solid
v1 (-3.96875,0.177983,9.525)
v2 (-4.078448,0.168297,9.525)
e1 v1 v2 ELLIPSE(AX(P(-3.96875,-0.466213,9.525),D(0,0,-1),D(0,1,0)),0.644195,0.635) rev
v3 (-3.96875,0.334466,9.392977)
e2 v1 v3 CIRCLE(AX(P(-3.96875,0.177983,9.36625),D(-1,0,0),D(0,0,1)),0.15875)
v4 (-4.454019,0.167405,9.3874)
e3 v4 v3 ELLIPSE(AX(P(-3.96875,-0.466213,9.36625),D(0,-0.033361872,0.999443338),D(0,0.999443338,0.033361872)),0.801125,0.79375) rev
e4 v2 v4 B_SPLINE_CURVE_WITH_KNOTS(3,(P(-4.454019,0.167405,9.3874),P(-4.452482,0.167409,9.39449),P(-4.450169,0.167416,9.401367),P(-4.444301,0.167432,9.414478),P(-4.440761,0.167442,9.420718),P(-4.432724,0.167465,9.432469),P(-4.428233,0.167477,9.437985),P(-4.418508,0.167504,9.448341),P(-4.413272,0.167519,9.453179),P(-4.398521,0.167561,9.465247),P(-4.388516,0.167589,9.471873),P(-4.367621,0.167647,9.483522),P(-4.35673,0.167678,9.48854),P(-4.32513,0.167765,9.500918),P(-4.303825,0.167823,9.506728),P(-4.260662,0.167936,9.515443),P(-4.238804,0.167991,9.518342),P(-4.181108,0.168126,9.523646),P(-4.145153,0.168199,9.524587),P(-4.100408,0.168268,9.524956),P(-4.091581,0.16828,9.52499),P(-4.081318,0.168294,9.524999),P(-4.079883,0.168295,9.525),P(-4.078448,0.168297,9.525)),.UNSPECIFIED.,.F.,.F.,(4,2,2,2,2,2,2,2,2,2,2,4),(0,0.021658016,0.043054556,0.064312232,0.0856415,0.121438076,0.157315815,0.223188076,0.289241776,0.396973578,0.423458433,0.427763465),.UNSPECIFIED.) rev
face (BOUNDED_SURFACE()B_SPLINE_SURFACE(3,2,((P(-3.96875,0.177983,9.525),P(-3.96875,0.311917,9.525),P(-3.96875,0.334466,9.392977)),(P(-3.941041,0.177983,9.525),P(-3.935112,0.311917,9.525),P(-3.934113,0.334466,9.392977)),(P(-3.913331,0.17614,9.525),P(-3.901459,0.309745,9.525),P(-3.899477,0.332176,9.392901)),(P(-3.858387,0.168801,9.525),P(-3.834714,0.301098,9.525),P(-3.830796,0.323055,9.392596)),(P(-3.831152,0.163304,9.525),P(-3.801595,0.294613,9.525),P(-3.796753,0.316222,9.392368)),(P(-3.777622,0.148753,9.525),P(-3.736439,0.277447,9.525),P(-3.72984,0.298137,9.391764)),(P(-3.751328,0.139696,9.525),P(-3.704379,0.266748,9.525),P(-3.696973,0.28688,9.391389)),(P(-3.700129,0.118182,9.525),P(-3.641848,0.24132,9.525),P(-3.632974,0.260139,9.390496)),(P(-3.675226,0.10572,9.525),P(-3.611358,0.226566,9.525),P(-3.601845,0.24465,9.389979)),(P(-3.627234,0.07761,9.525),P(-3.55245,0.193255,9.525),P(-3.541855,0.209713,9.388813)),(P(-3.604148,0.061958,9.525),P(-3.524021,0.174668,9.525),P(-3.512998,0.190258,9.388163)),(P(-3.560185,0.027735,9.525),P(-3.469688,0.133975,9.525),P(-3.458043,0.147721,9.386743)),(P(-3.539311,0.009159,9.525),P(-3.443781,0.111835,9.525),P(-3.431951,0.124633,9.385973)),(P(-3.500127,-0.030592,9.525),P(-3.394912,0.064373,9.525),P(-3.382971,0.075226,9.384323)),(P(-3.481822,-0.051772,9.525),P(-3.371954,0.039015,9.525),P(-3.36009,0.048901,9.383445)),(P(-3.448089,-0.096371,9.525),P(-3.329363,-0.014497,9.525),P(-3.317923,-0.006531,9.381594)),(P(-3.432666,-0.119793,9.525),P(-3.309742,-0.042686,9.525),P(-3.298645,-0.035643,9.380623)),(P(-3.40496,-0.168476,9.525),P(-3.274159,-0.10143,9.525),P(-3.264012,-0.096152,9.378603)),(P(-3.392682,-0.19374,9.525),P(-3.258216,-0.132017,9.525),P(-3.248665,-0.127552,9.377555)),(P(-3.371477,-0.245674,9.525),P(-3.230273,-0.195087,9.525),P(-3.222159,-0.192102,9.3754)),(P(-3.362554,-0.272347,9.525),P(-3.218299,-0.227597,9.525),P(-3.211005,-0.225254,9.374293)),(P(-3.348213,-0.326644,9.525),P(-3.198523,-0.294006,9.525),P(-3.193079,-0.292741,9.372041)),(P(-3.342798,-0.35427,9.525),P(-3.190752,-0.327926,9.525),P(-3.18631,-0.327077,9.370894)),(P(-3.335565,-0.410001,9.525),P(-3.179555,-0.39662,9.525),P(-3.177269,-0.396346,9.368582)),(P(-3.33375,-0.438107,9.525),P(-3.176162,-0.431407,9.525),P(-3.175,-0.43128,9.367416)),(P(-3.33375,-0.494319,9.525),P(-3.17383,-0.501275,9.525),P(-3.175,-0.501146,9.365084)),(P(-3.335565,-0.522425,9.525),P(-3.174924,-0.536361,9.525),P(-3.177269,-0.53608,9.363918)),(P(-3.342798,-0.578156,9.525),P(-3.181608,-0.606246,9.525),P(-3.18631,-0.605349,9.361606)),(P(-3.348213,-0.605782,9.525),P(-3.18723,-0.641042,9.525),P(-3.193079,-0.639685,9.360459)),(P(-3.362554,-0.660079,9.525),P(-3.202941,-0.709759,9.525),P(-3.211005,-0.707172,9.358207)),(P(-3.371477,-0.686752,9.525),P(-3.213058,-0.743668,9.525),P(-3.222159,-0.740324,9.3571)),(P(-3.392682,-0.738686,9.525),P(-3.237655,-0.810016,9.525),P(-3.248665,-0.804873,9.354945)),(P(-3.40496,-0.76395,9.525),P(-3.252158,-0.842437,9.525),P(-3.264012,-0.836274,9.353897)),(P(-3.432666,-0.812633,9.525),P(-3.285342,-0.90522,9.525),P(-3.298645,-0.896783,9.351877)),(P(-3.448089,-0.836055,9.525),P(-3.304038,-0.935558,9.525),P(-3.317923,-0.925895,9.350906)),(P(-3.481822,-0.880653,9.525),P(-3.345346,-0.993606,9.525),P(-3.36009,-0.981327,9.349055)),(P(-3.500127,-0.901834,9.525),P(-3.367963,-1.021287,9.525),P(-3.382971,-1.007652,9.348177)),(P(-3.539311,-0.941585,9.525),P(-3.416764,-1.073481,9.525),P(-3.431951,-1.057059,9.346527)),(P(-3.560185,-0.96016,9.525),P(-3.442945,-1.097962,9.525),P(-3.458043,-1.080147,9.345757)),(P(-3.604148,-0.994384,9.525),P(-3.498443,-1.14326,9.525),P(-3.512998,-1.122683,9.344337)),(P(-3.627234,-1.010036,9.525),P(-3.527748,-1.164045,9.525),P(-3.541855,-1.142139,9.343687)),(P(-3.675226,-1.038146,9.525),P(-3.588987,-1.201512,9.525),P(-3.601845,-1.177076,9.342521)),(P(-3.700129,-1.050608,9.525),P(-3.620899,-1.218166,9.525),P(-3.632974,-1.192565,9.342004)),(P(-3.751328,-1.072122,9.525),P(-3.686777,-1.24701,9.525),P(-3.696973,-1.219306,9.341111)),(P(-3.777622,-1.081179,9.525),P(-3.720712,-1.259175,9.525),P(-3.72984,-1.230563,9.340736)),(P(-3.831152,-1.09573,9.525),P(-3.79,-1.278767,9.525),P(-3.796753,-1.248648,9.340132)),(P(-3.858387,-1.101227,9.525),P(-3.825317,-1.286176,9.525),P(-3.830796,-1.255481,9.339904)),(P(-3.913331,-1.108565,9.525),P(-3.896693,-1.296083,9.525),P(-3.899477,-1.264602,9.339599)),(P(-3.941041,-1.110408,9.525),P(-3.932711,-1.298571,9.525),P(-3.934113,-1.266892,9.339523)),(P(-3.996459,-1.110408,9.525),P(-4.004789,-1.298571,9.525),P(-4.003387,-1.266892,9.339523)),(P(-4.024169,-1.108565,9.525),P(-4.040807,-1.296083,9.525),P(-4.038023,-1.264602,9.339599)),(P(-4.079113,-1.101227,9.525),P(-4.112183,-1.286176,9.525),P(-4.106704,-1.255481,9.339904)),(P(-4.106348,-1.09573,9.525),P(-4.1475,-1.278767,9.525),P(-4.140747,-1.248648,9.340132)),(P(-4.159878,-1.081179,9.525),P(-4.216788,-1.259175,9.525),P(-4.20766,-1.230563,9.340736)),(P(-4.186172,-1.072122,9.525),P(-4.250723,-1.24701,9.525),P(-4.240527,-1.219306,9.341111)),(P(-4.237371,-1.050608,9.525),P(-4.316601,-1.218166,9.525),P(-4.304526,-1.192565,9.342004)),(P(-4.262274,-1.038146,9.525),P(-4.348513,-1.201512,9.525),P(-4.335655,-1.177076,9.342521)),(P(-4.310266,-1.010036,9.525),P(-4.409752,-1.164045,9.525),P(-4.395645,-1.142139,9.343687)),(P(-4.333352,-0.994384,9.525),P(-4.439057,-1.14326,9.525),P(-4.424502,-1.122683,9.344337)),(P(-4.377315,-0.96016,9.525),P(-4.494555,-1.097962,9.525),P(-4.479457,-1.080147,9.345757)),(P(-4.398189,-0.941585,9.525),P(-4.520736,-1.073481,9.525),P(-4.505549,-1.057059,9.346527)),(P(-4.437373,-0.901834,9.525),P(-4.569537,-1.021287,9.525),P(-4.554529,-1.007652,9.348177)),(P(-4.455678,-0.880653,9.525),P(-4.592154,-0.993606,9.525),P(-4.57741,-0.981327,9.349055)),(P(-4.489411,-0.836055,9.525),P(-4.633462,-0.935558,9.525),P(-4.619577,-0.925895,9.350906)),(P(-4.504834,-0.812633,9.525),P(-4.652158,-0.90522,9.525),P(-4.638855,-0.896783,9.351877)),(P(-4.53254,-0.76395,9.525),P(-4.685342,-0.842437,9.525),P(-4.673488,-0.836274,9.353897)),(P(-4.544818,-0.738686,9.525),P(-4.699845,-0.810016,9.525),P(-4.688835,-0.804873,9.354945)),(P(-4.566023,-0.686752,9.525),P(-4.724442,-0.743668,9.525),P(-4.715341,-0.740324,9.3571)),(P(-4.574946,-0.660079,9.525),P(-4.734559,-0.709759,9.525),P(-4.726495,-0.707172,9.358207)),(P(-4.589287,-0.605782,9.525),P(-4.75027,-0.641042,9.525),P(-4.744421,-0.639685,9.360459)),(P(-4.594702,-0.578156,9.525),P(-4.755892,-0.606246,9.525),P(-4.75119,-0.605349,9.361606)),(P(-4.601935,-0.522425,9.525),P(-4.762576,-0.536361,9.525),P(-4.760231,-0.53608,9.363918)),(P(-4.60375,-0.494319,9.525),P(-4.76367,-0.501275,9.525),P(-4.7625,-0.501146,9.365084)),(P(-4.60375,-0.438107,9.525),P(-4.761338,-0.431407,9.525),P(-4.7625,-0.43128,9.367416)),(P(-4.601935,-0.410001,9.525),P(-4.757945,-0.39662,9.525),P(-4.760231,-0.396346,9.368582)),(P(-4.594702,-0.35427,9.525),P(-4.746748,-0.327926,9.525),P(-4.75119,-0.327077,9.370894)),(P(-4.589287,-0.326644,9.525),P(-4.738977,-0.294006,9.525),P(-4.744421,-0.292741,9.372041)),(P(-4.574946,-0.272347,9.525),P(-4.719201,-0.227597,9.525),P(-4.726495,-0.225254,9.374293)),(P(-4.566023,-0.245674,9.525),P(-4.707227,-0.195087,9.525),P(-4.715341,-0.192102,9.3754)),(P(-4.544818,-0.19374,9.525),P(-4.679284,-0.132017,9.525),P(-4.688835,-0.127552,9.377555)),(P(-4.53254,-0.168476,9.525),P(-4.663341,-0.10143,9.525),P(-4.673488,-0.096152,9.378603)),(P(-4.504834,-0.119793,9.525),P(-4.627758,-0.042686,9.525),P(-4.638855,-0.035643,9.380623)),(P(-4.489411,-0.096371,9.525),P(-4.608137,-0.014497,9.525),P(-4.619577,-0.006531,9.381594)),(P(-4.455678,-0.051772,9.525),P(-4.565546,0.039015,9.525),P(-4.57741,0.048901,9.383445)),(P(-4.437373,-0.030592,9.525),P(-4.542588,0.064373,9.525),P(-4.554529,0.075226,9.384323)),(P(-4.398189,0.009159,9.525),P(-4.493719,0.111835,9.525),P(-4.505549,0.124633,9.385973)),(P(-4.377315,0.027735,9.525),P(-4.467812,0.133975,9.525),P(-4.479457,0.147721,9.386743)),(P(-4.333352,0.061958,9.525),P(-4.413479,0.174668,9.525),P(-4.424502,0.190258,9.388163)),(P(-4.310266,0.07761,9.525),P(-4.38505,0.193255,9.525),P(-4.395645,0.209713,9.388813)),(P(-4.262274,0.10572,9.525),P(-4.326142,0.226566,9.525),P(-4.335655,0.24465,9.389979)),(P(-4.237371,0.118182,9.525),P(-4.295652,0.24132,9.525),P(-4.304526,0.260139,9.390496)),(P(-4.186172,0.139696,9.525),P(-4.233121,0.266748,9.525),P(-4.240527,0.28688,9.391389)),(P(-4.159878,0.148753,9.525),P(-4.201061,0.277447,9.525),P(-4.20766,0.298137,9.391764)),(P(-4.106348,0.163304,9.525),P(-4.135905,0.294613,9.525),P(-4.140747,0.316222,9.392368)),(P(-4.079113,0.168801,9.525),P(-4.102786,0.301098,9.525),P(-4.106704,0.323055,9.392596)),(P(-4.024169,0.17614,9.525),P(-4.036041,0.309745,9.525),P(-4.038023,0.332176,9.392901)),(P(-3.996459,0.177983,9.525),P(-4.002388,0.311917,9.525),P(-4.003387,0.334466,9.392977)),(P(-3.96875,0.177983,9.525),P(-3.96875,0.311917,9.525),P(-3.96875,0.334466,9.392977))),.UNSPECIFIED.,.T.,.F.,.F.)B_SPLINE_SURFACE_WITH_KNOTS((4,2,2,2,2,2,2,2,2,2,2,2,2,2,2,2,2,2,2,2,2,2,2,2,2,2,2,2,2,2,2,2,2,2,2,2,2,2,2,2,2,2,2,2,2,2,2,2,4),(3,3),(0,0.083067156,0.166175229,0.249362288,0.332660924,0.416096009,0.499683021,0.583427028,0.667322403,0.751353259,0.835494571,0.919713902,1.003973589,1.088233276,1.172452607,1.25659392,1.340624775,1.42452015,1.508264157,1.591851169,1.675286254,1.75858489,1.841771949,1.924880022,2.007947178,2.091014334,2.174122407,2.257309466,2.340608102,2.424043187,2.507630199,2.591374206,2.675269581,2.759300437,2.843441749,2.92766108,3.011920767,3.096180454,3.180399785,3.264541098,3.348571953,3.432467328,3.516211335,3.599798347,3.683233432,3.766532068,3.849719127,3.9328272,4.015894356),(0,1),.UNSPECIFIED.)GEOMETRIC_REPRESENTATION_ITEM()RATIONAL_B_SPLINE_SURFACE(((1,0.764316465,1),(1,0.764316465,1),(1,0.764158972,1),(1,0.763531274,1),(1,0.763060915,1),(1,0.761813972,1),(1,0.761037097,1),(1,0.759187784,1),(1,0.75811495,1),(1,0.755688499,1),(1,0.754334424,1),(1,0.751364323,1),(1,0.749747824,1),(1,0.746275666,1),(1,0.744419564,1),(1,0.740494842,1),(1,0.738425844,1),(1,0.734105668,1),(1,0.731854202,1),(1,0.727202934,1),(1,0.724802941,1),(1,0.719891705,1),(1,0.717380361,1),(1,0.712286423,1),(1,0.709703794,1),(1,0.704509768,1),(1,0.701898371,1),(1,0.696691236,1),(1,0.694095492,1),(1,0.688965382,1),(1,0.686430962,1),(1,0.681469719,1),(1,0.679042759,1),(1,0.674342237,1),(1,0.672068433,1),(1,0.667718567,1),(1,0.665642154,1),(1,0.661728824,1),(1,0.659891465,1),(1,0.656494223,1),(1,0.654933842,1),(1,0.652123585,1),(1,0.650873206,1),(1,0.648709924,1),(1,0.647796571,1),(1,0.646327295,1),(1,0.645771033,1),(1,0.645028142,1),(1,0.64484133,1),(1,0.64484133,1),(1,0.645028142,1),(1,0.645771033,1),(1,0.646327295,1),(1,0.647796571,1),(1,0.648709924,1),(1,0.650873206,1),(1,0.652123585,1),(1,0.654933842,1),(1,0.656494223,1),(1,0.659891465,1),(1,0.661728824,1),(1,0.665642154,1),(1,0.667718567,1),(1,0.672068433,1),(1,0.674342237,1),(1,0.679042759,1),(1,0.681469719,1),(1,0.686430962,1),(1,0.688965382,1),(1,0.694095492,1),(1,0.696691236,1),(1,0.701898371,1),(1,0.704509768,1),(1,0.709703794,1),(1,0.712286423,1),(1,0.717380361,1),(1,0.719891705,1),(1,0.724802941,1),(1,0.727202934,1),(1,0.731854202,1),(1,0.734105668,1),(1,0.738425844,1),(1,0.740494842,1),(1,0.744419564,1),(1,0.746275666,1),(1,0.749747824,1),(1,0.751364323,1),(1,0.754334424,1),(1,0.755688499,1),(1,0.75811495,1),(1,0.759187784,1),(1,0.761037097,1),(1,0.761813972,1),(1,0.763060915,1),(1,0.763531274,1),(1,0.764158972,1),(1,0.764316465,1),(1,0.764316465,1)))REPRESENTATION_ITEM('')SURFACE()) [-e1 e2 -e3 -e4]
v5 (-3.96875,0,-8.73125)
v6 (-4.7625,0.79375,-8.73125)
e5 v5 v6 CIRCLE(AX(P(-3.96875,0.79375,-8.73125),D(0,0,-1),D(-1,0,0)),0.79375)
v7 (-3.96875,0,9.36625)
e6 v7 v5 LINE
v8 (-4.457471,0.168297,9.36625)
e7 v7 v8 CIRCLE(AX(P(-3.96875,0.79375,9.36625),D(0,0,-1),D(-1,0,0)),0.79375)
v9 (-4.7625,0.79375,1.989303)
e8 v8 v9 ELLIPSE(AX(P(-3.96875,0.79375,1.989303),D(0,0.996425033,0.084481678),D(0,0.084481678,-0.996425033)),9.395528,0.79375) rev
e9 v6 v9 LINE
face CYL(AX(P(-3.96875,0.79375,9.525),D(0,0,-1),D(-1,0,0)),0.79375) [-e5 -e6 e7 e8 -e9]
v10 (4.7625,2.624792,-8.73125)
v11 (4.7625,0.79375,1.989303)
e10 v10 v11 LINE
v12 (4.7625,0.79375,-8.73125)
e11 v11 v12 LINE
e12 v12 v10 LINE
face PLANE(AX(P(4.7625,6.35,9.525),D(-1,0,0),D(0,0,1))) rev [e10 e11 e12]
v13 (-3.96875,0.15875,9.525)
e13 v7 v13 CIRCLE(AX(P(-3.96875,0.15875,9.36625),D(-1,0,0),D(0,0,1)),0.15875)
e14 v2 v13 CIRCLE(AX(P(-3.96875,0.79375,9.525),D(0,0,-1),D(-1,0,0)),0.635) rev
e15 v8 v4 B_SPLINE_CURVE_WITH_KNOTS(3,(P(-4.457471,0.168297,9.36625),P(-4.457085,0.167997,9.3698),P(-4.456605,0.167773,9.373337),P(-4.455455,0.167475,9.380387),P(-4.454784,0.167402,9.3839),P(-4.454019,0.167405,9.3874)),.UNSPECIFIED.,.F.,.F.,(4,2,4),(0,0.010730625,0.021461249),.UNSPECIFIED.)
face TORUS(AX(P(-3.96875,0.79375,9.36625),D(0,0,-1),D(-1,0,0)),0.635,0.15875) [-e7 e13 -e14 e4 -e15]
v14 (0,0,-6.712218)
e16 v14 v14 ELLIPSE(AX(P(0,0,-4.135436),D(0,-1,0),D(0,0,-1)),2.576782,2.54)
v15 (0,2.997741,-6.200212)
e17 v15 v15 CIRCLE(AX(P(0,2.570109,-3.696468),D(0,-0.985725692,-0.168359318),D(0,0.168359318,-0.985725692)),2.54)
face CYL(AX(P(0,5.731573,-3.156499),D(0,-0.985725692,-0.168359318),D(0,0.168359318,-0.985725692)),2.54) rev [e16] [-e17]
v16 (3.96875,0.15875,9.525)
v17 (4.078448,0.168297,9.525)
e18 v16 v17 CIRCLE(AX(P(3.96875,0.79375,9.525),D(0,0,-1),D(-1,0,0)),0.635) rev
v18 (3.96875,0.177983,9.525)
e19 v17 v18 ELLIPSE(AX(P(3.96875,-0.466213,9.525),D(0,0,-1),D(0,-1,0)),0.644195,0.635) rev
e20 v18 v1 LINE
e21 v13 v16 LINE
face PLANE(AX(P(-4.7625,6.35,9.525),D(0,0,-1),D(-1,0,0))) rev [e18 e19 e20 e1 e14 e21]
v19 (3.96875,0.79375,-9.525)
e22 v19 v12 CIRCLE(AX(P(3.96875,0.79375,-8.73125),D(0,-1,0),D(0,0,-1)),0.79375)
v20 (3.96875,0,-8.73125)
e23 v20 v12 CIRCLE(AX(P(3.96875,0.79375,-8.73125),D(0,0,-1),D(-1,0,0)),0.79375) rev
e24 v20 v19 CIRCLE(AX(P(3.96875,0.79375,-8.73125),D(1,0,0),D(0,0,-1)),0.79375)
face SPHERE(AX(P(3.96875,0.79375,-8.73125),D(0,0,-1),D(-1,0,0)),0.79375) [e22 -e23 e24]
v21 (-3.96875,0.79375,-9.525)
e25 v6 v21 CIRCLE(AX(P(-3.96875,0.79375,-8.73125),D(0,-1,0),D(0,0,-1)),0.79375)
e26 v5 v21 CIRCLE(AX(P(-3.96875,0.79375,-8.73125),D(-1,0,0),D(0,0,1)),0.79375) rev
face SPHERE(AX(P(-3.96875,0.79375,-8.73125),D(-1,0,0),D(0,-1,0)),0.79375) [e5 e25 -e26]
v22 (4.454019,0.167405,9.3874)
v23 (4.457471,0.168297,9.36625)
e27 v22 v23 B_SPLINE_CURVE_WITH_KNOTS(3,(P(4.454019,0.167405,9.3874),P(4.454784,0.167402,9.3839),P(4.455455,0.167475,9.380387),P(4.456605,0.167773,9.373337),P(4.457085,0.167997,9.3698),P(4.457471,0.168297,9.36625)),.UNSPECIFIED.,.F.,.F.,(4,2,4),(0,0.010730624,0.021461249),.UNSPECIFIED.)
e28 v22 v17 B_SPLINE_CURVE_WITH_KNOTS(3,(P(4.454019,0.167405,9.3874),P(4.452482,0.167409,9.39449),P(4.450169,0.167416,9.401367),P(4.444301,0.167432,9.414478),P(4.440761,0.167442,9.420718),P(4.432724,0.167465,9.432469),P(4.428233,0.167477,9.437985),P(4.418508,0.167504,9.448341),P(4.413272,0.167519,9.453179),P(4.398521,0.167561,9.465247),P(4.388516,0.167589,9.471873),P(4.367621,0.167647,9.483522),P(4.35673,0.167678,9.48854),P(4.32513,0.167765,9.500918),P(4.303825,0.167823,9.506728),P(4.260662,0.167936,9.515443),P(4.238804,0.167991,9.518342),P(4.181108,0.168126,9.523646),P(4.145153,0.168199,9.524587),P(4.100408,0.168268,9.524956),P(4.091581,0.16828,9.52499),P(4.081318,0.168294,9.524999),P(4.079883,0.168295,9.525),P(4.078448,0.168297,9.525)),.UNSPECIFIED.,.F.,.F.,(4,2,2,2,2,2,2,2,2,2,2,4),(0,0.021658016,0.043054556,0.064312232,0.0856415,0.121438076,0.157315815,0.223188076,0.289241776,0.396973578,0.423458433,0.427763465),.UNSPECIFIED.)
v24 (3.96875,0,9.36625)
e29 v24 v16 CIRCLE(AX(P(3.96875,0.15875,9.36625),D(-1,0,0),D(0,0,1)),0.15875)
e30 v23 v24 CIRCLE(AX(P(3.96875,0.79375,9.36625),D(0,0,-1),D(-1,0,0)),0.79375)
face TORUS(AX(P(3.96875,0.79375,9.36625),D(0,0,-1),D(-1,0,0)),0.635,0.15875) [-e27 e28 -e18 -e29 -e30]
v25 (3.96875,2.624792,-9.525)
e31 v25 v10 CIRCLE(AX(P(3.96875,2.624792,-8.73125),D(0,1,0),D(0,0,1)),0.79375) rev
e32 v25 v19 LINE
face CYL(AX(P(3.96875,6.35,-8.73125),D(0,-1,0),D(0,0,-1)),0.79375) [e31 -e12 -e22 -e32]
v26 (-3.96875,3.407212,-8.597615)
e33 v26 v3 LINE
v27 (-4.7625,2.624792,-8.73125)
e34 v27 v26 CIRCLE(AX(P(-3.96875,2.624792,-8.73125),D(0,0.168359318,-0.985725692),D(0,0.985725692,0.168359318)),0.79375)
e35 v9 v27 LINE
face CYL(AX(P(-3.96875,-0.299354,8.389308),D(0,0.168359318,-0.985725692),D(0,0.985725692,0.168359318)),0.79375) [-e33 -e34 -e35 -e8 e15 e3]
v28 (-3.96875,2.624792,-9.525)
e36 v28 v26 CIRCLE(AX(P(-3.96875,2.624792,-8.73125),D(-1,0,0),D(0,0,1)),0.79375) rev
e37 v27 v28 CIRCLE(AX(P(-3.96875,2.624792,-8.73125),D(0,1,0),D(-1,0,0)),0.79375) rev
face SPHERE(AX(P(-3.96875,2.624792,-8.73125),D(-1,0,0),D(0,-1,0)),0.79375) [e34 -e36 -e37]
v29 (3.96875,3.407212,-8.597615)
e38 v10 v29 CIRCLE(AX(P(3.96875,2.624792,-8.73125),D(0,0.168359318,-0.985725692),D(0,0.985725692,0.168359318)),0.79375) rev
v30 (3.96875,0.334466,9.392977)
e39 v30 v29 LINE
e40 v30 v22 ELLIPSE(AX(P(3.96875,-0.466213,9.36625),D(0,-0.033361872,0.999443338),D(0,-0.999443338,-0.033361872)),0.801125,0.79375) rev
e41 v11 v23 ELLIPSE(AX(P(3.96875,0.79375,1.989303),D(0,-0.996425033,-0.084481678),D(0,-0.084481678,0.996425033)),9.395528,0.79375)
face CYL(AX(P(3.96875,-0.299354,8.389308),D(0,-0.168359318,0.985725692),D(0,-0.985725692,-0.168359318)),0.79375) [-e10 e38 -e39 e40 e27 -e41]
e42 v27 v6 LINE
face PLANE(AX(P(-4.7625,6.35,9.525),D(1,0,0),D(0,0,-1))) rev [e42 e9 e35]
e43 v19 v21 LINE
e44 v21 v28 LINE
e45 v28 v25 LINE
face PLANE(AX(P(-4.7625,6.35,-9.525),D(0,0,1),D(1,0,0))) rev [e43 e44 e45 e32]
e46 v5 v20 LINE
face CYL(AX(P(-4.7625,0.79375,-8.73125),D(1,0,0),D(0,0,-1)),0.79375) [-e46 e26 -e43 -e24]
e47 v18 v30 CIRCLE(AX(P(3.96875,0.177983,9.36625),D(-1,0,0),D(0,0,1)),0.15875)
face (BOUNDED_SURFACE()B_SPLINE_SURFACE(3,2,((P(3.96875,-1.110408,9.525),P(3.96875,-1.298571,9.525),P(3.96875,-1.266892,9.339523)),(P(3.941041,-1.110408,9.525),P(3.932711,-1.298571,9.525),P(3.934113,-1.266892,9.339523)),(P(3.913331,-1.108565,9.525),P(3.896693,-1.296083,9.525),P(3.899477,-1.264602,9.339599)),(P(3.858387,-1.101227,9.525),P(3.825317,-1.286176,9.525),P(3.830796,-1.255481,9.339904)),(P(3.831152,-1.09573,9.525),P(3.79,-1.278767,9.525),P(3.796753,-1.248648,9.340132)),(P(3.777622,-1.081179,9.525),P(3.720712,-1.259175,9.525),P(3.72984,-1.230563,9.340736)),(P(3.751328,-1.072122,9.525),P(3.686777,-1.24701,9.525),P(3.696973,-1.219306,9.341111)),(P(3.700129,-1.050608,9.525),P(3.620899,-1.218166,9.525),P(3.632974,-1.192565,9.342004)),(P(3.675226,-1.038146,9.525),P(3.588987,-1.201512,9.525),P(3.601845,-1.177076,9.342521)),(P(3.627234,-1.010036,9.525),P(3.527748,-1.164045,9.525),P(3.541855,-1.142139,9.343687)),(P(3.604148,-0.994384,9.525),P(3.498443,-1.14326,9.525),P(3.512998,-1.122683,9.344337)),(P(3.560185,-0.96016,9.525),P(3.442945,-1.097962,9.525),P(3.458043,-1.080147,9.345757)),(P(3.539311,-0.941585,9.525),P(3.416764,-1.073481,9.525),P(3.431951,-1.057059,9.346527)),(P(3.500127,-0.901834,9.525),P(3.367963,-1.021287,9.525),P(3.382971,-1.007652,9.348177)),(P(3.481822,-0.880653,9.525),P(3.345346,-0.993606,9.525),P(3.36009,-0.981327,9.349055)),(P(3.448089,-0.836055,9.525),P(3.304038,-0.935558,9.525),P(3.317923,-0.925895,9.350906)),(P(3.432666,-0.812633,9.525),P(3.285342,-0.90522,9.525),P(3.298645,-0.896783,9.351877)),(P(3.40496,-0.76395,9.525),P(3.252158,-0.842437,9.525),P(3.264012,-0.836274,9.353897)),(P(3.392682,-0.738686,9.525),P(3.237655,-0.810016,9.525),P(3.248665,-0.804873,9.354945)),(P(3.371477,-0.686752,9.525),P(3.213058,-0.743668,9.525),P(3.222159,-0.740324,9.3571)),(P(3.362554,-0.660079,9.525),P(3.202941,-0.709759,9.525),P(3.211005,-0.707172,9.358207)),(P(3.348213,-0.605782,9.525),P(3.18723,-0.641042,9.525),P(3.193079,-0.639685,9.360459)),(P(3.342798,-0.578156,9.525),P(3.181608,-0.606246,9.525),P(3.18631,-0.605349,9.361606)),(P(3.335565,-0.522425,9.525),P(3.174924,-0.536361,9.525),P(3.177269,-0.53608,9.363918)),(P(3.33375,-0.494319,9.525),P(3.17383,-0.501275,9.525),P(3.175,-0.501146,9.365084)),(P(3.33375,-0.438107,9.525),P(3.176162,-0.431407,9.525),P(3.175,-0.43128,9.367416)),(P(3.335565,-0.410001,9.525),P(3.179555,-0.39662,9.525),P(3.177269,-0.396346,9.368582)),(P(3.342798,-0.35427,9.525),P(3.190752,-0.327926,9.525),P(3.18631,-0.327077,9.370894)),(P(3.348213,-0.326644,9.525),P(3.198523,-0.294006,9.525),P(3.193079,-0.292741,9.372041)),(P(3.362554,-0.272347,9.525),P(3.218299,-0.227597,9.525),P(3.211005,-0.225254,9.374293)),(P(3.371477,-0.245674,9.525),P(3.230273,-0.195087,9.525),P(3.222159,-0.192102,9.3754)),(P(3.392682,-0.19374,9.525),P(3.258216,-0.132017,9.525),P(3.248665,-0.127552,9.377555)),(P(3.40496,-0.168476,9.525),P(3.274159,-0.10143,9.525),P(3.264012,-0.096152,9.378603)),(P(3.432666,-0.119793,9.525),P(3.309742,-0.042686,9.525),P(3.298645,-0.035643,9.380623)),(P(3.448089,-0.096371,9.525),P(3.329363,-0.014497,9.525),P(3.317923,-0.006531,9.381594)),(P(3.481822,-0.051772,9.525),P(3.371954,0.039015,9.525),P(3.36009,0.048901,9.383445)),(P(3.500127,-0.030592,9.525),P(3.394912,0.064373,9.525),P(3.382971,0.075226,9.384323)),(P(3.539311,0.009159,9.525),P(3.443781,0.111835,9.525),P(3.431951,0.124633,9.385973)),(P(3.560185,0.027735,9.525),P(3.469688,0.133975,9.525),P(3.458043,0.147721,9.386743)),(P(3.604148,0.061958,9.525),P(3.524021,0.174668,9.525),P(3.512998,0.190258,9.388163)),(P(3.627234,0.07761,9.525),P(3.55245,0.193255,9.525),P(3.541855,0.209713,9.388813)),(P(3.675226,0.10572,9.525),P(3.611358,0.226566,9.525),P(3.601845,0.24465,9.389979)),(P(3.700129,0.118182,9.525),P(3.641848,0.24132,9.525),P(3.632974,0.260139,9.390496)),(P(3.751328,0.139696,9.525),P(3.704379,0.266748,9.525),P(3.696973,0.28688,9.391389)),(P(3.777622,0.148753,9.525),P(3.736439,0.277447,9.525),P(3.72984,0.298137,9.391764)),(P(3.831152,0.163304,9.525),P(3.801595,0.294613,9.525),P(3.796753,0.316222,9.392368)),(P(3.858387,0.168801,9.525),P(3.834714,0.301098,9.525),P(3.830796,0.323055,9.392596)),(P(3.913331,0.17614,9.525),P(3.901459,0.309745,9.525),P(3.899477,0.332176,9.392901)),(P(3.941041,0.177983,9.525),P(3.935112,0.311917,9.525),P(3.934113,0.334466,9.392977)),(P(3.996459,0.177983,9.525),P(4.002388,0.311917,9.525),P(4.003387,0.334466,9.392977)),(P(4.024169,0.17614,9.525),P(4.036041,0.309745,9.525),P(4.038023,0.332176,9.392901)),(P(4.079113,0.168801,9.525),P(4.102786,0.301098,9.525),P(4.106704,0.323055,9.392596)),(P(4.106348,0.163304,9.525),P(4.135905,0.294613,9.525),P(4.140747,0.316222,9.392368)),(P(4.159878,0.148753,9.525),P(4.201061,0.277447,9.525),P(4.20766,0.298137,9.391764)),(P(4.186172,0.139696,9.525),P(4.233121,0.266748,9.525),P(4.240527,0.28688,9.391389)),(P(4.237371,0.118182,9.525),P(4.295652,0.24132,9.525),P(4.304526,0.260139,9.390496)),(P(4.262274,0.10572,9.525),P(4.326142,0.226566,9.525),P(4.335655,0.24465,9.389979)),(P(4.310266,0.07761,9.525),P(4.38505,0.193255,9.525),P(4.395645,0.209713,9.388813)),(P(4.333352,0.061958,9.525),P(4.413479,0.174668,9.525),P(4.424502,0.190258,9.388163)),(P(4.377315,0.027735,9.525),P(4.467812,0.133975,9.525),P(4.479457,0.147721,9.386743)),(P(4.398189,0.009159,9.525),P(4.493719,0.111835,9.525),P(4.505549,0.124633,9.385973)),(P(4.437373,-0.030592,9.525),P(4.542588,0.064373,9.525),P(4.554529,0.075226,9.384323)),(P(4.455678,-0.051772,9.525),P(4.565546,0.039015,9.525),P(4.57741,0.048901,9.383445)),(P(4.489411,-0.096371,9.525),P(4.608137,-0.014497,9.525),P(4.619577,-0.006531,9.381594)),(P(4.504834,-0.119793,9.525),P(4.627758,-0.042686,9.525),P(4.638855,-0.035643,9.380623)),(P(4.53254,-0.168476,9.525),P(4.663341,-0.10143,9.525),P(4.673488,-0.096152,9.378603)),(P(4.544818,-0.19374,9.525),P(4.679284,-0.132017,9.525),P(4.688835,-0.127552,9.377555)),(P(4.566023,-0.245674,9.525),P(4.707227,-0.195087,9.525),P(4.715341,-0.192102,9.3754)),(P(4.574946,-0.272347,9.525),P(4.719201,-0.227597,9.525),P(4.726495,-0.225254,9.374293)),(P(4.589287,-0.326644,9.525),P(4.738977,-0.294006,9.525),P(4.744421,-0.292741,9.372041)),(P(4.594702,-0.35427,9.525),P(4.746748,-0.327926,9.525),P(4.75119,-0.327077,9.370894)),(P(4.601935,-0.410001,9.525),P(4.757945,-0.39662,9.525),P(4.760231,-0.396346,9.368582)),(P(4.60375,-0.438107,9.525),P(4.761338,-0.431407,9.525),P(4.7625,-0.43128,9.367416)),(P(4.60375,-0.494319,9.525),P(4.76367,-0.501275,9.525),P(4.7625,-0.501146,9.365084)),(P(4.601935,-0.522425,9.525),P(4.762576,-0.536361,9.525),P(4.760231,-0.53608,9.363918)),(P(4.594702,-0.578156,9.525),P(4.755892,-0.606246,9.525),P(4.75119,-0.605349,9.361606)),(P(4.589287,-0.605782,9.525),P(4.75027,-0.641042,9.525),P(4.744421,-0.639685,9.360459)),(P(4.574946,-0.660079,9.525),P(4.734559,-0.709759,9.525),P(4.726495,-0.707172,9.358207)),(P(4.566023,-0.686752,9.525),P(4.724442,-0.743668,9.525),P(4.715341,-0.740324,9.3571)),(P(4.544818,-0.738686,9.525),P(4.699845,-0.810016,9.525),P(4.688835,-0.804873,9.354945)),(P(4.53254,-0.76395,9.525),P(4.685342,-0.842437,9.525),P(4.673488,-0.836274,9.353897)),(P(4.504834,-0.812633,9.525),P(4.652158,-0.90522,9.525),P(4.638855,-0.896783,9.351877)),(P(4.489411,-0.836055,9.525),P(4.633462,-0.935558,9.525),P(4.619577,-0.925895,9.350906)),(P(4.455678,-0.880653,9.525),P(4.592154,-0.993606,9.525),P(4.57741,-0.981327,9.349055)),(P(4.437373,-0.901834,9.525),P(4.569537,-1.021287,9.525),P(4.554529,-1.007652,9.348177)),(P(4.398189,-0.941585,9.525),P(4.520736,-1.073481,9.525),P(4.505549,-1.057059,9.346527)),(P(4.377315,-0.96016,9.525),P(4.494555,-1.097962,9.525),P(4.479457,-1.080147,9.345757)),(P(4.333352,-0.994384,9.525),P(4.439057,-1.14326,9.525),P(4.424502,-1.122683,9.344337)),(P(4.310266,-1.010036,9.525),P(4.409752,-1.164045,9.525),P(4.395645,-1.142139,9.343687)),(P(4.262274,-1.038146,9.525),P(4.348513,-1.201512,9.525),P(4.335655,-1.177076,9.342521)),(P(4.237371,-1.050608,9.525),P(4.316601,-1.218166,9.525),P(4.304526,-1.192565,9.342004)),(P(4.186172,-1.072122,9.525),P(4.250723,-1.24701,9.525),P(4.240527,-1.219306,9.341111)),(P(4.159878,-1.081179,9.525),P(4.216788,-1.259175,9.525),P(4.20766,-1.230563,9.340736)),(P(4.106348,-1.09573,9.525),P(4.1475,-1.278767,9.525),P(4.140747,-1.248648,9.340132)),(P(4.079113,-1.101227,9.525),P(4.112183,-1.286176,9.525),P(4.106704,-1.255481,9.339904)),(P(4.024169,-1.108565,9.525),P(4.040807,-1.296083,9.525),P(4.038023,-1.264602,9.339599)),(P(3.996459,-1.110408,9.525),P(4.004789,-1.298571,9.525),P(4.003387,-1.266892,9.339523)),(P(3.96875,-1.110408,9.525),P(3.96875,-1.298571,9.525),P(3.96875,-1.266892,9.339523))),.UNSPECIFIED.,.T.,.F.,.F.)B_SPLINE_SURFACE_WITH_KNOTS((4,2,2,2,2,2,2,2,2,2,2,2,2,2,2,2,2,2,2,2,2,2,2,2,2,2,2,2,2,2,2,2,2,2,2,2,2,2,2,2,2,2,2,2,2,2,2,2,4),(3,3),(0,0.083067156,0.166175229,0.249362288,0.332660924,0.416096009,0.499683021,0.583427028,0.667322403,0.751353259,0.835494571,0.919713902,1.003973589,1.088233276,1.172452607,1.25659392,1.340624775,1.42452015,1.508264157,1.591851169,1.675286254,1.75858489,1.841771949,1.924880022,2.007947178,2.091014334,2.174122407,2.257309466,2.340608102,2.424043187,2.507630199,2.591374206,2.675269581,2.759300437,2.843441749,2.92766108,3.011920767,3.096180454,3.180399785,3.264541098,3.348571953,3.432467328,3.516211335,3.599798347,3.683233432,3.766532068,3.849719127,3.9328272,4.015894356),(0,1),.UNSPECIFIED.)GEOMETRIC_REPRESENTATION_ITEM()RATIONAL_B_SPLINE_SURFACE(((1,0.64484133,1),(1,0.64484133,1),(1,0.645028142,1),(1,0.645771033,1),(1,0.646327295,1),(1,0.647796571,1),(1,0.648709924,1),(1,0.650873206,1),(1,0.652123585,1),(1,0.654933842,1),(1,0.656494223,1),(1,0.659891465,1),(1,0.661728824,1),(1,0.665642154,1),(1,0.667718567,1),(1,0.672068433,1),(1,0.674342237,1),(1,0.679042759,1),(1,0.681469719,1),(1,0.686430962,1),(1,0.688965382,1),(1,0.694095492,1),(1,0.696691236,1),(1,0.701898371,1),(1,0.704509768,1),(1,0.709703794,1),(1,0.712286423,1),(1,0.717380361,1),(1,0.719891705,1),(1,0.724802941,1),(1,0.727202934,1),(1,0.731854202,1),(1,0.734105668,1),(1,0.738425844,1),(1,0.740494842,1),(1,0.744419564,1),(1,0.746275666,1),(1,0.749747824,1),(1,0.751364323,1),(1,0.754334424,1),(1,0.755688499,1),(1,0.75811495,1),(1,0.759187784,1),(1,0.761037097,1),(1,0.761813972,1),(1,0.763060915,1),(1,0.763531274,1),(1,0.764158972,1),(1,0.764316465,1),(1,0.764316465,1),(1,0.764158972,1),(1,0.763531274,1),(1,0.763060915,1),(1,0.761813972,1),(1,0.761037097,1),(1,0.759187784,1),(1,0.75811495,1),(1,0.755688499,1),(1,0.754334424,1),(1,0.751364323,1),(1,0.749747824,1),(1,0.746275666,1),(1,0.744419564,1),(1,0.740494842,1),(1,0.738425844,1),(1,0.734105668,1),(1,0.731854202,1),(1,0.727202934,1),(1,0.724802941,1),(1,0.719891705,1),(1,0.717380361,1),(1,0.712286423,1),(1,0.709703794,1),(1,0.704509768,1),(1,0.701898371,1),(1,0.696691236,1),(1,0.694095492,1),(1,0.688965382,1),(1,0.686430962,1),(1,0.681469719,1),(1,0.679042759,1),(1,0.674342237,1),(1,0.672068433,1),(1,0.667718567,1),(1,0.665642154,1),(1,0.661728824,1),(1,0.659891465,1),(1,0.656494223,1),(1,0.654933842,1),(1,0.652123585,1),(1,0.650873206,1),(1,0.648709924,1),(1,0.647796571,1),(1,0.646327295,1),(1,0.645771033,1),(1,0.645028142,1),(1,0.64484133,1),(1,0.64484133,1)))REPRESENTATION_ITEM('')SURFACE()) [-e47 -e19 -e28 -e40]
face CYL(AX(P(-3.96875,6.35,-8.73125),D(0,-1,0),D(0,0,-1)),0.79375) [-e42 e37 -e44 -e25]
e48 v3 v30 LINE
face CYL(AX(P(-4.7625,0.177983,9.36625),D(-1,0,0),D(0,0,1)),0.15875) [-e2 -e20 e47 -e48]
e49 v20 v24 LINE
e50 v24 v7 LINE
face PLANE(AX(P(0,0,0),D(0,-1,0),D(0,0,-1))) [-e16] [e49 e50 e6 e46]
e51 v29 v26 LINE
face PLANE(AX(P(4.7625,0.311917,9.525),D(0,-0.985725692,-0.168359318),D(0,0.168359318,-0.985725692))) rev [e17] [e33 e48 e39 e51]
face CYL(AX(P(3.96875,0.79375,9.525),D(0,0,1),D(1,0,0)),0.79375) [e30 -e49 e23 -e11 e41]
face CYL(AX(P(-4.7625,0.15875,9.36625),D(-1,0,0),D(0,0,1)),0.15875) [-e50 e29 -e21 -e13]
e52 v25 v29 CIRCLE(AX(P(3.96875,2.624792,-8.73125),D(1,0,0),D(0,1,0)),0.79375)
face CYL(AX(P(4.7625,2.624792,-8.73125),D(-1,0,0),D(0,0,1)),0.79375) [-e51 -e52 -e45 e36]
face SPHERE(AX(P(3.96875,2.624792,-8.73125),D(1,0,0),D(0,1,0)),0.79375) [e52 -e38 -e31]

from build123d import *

# Parameters (mm, degrees)
SKETCH1_W               = 9.525
SKETCH1_H               = 19.05
BOSS_EXTRUDE1_DEPTH     = 6.35
CUT_EXTRUDE4_DEPTH      = 15.892070037
CUT_EXTRUDE4_DEPTH_BACK = 15.892070037
CUT_EXTRUDE6_DEPTH      = 11.962309672
CUT_EXTRUDE6_DEPTH_BACK = 11.962309672
SKETCH7_R               = 2.54
FILLET2_R               = 0.79375
FILLET3_R               = 0.15875


with BuildPart() as part:
    # Sketch1 → Boss-Extrude1 (new body)
    with BuildSketch(Plane(origin=(0, 0, 0), x_dir=(1, 0, 0), z_dir=(0, 1, 0))):
        Rectangle(SKETCH1_W, SKETCH1_H)
    extrude(amount=BOSS_EXTRUDE1_DEPTH)

    # Sketch4 → Cut-Extrude4 (cut, two sides: drawn at the far end of the back side and taken through both)
    with BuildSketch(Plane.ZY.offset(4.7625).offset(-CUT_EXTRUDE4_DEPTH_BACK)):
        Polygon((9.525, 0.311917294), (-9.525, 3.56560647), (-9.525, 6.35), (9.525, 6.35), align=None)
    extrude(amount=CUT_EXTRUDE4_DEPTH + CUT_EXTRUDE4_DEPTH_BACK, mode=Mode.SUBTRACT)

    # Sketch7 → Cut-Extrude6 (cut, two sides: drawn at the far end of the back side and taken through both)
    with BuildSketch(Plane(origin=(0, 1.911087398, 0.162031127), x_dir=(1, 0, 0), z_dir=(0, -0.9857256920245803, -0.16835931837193446)).offset(-CUT_EXTRUDE6_DEPTH_BACK)):
        with Locations(Location((0, -3.914374553, 0), (0, 0, 270))):
            Circle(SKETCH7_R)
    extrude(amount=CUT_EXTRUDE6_DEPTH + CUT_EXTRUDE6_DEPTH_BACK, mode=Mode.SUBTRACT)

    # Fillet2
    # the kernel refuses this fillet: 0.79375 mm, written as the material it takes off along each edge
    with BuildSketch(Plane(origin=(3.96875, 0.79375, -8.73125), x_dir=(1, 0, 0), z_dir=(0, -1, 0))) as fillet2_piece_1_section:
        Polygon((0, 0), (FILLET2_R, 0), (FILLET2_R, -FILLET2_R), (0, -FILLET2_R), align=None)
    fillet2_piece_1 = extrude(amount=FILLET2_R, mode=Mode.PRIVATE)
    fillet2_piece_1 = fillet2_piece_1 - Plane(origin=(3.96875, 0.79375, -8.73125), x_dir=(-0.7071067811865475, 0, 0.7071067811865475), z_dir=(0, -1, 0)) * Sphere(FILLET2_R, mode=Mode.PRIVATE)
    add(fillet2_piece_1, mode=Mode.SUBTRACT)
    with BuildSketch(Plane(origin=(3.96875, 2.624791783, -8.73125), x_dir=(0, 0.9857256920245803, 0.16835931837193446), z_dir=(1, 0, 0))) as fillet2_piece_2_section:
        Polygon((0, 0), (FILLET2_R, 0), (FILLET2_R, -FILLET2_R * 1.18527834653), (-FILLET2_R * 0.168359318372, -FILLET2_R * 0.985725692025), align=None)
    fillet2_piece_2 = extrude(amount=FILLET2_R, mode=Mode.PRIVATE)
    fillet2_piece_2 = fillet2_piece_2 - Plane(origin=(3.96875, 2.624791783, -8.73125), x_dir=(0, -0.7643164653374722, 0.6448413299518206), z_dir=(1, 0, 0)) * Sphere(FILLET2_R, mode=Mode.PRIVATE)
    add(fillet2_piece_2, mode=Mode.SUBTRACT)
    with BuildSketch(Plane(origin=(-3.96875, 0.79375, -8.73125), x_dir=(-1, 0, 0), z_dir=(0, -1, 0))) as fillet2_piece_3_section:
        Polygon((0, 0), (FILLET2_R, 0), (FILLET2_R, FILLET2_R), (0, FILLET2_R), align=None)
    fillet2_piece_3 = extrude(amount=FILLET2_R, mode=Mode.PRIVATE)
    fillet2_piece_3 = fillet2_piece_3 - Plane(origin=(-3.96875, 0.79375, -8.73125), x_dir=(0.7071067811865475, 0, 0.7071067811865475), z_dir=(0, -1, 0)) * Sphere(FILLET2_R, mode=Mode.PRIVATE)
    add(fillet2_piece_3, mode=Mode.SUBTRACT)
    with BuildSketch(Plane(origin=(-3.96875, 2.624791783, -8.73125), x_dir=(0, 0, -1), z_dir=(-1, 0, 0))) as fillet2_piece_4_section:
        Polygon((0, 0), (FILLET2_R, 0), (FILLET2_R, -FILLET2_R * 1.18527834653), (-FILLET2_R * 0.168359318372, -FILLET2_R * 0.985725692025), align=None)
    fillet2_piece_4 = extrude(amount=FILLET2_R, mode=Mode.PRIVATE)
    fillet2_piece_4 = fillet2_piece_4 - Plane(origin=(-3.96875, 2.624791783, -8.73125), x_dir=(0, -0.7643164653374722, 0.6448413299518206), z_dir=(-1, 0, 0)) * Sphere(FILLET2_R, mode=Mode.PRIVATE)
    add(fillet2_piece_4, mode=Mode.SUBTRACT)
    with BuildSketch(Plane(origin=(4.7625, 0, 11.509375), x_dir=(-1, 0, 0), z_dir=(0, 0, -1)), Plane(origin=(-4.7625, 0, -8.73125), x_dir=(1, 0, 0), z_dir=(0, 0, 1))) as fillet2_piece_5:
        with BuildLine():
            CenterArc((FILLET2_R, FILLET2_R), FILLET2_R, 180, 90)
            Line((0, FILLET2_R), (0, 0))
            Line((0, 0), (FILLET2_R, 0))
        make_face()
    extrude(amount=20.240625, mode=Mode.SUBTRACT)
    with BuildSketch(Plane(origin=(4.7625, 3.407211551, -8.597614791), x_dir=(0, -0.9857256920245803, -0.16835931837193446), z_dir=(0, -0.16835931837193446, 0.9857256920245803))) as fillet2_piece_6:
        with BuildLine():
            CenterArc((FILLET2_R, -FILLET2_R), FILLET2_R, 90, 90)
            Line((0, -FILLET2_R), (0, 0))
            Line((0, 0), (FILLET2_R, 0))
        make_face()
    extrude(amount=20.369423637, mode=Mode.SUBTRACT)
    with BuildSketch(Plane(origin=(3.96875, 0, -9.525), x_dir=(0, 0, 1), z_dir=(-1, 0, 0))) as fillet2_piece_7:
        with BuildLine():
            CenterArc((FILLET2_R, FILLET2_R), FILLET2_R, 180, 90)
            Line((0, FILLET2_R), (0, 0))
            Line((0, 0), (FILLET2_R, 0))
        make_face()
    extrude(amount=7.9375, mode=Mode.SUBTRACT)
    with BuildSketch(Plane(origin=(4.7625, 0.79375, -9.525), x_dir=(0, 0, 1), z_dir=(0, 1, 0))) as fillet2_piece_8:
        with BuildLine():
            CenterArc((FILLET2_R, -FILLET2_R), FILLET2_R, 90, 90)
            Line((0, -FILLET2_R), (0, 0))
            Line((0, 0), (FILLET2_R, 0))
        make_face()
    extrude(amount=1.831041783, mode=Mode.SUBTRACT)
    with BuildSketch(Plane(origin=(-3.96875, 3.56560647, -9.525), x_dir=(0, -0.16835931837193435, 0.9857256920245803), z_dir=(1, 0, 0))) as fillet2_piece_9:
        with BuildLine():
            CenterArc((FILLET2_R * 1.18527834653, FILLET2_R), FILLET2_R, 170.307559955, 99.692440045)
            Line((FILLET2_R * 0.199552654502, FILLET2_R * 1.16835931837), (0, 0))
            Line((0, 0), (FILLET2_R * 1.18527834653, 0))
        make_face()
    extrude(amount=7.9375, mode=Mode.SUBTRACT)
    with BuildSketch(Plane(origin=(-4.7625, 0.79375, -9.525), x_dir=(0, 0, 1), z_dir=(0, 1, 0))) as fillet2_piece_10:
        with BuildLine():
            CenterArc((FILLET2_R, FILLET2_R), FILLET2_R, 180, 90)
            Line((0, FILLET2_R), (0, 0))
            Line((0, 0), (FILLET2_R, 0))
        make_face()
    extrude(amount=1.831041783, mode=Mode.SUBTRACT)
    with BuildSketch(Plane(origin=(-4.7625, -0.022170729, 11.48104942), x_dir=(1, 0, 0), z_dir=(0, 0.16835931837193446, -0.9857256920245803))) as fillet2_piece_11:
        with BuildLine():
            CenterArc((FILLET2_R, FILLET2_R), FILLET2_R, 180, 90)
            Line((0, FILLET2_R), (0, 0))
            Line((0, 0), (FILLET2_R, 0))
        make_face()
    extrude(amount=20.369423637, mode=Mode.SUBTRACT)

    # Fillet3
    fillet3_edges = [part.edges().sort_by_distance(p)[0] for p in [
        (-4.216643426, 0.039702314, 9.525),
        (4.216643426, 0.039702314, 9.525),
        (4.216960585, 0.271534198, 9.525),
        (-4.216960585, 0.271534198, 9.525),
        (0, 0, 9.525),
        (0, 0.311917294, 9.525),
    ]]
    fillet(fillet3_edges, radius=FILLET3_R)


solid = part.part
